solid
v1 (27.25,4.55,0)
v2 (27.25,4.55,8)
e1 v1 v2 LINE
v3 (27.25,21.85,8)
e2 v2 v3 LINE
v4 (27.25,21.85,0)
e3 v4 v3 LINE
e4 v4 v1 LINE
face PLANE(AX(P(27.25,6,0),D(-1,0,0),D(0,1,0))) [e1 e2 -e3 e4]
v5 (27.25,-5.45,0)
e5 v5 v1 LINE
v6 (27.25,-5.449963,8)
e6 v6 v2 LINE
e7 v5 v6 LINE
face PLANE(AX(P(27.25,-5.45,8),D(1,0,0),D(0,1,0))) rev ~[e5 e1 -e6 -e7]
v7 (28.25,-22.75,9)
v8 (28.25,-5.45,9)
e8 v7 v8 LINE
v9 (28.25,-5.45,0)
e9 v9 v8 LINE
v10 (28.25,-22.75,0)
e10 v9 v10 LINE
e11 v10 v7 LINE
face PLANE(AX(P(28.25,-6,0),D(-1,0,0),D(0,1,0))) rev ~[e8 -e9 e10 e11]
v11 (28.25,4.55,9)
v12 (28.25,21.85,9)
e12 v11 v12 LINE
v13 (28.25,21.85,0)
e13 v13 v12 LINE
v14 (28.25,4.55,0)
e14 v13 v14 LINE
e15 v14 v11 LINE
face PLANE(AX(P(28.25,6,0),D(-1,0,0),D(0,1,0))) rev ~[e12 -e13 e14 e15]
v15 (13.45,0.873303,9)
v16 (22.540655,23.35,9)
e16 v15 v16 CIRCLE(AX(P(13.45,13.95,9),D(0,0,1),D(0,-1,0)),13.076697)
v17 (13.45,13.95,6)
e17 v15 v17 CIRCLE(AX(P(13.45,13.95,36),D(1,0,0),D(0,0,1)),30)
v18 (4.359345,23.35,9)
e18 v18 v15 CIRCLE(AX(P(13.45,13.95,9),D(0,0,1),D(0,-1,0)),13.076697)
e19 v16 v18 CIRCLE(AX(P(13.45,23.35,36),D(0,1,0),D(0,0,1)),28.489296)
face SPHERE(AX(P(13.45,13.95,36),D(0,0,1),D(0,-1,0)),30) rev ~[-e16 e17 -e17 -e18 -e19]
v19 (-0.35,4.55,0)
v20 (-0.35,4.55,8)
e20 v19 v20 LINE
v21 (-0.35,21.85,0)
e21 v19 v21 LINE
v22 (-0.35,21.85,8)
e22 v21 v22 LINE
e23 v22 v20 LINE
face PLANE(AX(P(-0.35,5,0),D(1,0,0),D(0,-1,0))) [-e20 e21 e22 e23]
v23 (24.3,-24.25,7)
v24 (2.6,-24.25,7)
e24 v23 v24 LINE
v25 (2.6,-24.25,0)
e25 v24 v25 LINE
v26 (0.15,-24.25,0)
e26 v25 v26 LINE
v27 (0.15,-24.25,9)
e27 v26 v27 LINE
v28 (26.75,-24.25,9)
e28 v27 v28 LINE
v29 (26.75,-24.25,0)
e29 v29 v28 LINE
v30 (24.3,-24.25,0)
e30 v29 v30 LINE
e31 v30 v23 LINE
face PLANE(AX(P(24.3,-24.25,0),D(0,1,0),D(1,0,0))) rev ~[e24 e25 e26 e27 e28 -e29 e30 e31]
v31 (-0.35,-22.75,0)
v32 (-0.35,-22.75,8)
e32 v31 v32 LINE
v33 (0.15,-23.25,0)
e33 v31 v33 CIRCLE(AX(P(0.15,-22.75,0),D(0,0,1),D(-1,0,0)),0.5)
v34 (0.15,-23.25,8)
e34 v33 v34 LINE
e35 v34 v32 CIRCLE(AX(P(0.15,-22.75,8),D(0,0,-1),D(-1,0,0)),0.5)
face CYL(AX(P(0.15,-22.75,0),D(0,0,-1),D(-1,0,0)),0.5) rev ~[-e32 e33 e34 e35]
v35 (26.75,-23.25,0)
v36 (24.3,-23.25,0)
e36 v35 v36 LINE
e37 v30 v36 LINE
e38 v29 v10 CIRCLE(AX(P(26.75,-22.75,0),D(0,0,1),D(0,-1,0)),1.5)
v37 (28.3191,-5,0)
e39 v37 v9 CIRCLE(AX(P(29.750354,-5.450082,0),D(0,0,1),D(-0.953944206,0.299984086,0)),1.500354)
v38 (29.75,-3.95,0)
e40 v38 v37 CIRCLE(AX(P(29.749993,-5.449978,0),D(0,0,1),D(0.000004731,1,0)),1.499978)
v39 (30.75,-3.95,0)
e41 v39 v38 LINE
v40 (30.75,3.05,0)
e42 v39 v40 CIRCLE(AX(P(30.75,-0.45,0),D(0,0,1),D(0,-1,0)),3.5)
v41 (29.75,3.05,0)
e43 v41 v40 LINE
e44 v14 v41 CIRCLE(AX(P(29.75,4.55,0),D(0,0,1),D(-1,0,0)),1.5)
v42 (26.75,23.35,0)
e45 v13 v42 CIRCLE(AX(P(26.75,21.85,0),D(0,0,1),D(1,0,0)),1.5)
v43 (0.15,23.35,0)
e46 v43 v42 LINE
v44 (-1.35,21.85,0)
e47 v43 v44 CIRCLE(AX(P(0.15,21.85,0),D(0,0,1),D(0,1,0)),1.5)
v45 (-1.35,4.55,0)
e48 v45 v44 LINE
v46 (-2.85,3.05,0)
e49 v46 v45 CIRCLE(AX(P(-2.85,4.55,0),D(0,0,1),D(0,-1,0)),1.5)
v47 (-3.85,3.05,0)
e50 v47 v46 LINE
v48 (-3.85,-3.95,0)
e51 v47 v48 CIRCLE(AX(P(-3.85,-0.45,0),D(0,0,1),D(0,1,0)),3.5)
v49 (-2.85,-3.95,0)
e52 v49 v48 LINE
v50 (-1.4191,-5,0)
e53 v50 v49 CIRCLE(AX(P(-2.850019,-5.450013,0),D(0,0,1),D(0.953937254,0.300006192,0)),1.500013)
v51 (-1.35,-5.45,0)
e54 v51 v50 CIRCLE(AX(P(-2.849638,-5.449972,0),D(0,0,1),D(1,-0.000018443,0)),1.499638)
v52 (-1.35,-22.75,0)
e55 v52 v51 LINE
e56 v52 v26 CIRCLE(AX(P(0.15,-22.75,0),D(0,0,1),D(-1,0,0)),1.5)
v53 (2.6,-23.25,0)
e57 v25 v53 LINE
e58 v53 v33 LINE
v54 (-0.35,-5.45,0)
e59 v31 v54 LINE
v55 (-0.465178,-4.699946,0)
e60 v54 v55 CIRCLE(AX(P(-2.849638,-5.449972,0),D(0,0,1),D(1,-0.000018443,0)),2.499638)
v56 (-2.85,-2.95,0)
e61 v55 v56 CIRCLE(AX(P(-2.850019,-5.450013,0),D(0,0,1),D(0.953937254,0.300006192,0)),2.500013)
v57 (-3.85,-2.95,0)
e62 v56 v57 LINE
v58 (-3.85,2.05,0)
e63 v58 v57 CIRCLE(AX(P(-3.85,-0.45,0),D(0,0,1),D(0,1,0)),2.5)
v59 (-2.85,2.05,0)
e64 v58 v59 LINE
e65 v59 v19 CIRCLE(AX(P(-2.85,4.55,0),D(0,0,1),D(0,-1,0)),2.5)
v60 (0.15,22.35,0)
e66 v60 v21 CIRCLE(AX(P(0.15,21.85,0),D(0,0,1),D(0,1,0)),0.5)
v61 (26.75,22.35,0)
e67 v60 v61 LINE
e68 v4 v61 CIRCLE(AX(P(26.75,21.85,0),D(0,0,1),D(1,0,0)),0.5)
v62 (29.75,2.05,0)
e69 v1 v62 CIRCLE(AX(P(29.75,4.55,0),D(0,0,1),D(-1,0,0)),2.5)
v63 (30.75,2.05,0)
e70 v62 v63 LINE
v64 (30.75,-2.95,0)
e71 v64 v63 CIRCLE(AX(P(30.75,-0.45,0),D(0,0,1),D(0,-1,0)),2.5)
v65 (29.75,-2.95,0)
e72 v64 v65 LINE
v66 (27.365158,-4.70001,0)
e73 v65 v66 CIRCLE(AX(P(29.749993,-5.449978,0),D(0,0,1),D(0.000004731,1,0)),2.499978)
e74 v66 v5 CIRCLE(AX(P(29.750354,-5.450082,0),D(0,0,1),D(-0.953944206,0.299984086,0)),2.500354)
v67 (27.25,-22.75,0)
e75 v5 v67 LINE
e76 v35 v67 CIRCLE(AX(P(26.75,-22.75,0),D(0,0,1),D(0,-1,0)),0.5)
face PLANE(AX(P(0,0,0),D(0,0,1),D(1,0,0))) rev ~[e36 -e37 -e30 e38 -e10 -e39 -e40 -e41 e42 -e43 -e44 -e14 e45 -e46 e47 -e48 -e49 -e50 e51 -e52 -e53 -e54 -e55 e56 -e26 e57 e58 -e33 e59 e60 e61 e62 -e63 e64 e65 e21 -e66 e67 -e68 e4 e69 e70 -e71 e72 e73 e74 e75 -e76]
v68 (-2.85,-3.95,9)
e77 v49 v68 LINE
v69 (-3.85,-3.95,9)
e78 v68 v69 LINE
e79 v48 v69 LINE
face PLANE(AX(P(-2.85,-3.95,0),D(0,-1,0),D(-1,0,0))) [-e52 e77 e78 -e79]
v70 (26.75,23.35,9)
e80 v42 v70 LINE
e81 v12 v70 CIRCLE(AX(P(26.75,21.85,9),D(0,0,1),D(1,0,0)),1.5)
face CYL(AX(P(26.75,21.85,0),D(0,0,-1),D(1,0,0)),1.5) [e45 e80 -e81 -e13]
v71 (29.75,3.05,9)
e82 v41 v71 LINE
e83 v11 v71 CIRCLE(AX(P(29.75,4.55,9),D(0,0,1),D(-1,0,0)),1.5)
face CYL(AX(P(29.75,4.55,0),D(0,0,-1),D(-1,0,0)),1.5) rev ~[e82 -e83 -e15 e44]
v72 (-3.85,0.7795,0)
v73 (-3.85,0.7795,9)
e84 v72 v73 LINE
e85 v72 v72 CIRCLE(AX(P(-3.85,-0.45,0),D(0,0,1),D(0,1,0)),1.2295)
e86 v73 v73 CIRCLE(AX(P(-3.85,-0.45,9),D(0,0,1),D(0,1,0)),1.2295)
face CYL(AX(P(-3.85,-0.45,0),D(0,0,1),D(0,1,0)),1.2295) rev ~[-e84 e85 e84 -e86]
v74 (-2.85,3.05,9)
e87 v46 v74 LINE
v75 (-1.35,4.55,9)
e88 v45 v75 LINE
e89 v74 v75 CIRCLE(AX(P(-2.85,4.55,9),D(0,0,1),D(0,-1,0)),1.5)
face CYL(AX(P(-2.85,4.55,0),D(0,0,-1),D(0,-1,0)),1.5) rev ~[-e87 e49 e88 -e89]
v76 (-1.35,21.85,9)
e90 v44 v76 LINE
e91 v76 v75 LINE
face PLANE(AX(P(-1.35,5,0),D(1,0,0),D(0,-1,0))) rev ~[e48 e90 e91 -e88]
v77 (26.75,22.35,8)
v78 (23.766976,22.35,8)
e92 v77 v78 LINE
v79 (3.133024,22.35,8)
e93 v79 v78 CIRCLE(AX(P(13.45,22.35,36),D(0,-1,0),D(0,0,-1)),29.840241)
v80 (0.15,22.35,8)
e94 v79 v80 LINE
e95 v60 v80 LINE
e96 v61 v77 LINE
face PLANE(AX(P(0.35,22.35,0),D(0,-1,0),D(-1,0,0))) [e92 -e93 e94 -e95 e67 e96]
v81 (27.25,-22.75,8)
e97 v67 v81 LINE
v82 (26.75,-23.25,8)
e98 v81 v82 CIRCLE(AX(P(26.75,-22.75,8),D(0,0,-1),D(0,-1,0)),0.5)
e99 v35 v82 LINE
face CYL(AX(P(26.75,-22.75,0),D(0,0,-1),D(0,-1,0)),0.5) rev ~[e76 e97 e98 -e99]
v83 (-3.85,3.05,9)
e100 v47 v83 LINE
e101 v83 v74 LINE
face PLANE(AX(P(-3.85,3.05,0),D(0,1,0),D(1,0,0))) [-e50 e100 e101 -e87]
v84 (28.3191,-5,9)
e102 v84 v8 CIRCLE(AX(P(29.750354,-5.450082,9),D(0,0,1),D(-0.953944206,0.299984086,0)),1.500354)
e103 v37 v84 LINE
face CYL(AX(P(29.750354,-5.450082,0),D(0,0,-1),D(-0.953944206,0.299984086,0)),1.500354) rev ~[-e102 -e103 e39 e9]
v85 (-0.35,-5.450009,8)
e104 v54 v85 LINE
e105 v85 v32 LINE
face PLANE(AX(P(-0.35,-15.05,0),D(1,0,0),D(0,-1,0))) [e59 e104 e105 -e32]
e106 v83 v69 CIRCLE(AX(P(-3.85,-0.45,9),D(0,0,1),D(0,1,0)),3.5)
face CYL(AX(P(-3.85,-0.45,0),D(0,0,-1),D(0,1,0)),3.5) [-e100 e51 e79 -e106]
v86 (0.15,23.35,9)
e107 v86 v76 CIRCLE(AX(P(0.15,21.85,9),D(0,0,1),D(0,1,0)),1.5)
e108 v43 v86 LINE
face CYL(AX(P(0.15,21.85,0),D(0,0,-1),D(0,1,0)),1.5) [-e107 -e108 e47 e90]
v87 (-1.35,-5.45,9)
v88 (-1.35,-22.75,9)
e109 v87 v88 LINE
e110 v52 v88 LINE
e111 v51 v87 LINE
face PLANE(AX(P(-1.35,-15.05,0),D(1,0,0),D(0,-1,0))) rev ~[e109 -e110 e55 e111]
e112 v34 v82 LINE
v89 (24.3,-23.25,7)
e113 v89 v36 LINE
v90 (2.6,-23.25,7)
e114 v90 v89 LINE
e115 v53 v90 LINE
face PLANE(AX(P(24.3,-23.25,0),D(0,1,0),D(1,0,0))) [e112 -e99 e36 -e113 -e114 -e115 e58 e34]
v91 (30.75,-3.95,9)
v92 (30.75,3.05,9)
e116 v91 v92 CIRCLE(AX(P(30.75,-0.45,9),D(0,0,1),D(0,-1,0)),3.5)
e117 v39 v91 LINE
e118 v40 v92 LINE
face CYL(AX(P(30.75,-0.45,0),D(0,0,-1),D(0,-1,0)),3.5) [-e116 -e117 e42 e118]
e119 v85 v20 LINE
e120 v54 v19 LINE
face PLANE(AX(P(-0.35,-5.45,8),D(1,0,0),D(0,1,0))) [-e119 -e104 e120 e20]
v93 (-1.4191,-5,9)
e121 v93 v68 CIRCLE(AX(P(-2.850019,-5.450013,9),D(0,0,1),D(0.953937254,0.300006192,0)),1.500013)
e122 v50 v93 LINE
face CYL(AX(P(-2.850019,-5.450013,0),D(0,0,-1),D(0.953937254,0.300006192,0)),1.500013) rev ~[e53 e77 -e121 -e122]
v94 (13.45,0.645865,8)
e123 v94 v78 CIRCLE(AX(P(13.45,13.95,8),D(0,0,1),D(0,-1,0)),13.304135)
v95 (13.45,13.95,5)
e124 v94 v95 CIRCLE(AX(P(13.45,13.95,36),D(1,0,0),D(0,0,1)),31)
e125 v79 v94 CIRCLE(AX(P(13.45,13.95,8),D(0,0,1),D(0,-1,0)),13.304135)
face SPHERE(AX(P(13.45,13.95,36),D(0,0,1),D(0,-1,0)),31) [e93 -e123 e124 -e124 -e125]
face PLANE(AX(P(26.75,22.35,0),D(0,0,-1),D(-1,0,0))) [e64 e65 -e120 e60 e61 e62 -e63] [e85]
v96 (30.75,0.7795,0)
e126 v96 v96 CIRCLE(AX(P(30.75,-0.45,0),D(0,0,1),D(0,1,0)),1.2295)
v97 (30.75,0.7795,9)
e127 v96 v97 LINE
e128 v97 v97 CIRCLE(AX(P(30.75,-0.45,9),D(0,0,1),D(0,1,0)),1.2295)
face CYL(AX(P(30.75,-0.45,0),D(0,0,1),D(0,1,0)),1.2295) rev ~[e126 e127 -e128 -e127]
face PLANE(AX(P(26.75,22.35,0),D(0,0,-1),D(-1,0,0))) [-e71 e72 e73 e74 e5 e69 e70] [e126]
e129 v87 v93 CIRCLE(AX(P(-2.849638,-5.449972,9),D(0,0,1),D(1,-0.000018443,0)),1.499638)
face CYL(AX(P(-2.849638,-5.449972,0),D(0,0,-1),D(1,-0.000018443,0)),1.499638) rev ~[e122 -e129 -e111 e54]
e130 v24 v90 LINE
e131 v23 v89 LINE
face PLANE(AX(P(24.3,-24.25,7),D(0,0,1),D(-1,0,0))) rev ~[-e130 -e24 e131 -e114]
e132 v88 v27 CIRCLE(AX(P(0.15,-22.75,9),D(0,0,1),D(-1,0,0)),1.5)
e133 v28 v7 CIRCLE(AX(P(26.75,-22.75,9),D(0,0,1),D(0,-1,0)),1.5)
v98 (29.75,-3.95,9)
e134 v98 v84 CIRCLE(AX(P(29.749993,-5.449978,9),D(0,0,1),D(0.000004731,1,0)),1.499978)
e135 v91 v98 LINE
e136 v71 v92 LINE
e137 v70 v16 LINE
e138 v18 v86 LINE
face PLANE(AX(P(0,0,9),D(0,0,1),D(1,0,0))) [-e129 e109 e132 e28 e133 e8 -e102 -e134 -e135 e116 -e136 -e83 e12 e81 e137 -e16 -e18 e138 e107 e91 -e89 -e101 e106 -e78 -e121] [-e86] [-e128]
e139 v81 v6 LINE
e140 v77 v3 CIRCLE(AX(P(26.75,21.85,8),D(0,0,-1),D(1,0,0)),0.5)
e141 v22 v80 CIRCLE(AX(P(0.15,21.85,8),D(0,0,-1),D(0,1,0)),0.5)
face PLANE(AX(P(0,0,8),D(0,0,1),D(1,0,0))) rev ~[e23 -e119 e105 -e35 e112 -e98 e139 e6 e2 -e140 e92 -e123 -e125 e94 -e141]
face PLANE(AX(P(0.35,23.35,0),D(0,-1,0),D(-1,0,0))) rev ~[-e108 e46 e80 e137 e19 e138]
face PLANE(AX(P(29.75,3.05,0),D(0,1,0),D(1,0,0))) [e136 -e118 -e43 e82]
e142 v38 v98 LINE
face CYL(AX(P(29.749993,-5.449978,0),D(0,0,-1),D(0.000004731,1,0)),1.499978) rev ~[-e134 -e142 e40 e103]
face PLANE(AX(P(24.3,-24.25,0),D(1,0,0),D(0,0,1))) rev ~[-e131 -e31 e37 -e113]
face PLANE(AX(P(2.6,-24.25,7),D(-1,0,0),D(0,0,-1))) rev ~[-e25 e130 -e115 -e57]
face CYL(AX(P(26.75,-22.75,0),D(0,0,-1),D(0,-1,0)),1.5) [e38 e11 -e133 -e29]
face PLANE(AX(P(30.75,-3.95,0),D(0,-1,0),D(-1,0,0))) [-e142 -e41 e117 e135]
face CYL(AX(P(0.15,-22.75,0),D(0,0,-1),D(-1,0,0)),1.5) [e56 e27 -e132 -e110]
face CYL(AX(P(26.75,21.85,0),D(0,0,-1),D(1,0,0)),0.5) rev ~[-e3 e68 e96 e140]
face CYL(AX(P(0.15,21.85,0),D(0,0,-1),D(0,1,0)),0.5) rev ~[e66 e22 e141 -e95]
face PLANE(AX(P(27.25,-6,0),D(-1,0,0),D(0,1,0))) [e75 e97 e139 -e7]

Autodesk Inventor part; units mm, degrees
ref_plane "YZ Plane" through (0, 0, 0) normal (1, 0, 0) x (0, 1, 0)
ref_plane "XZ Plane" through (0, 0, 0) normal (0, 1, 0) x (-1, 0, 0)
ref_plane "XY Plane" through (0, 0, 0) normal (0, 0, 1) x (1, 0, 0)
sketch "Sketch1" plane through (0, 0, 0) normal (0, 0, 1) x (1, 0, 0)
  arc A0 (-3.85, 3.05) -> (-3.85, -3.95) centre (-3.85, -0.45) ccw projected
  arc A1 (-1.4191, -5) -> (-2.85, -3.95) centre (-2.85, -5.45) ccw projected
  line L0 (-2.85, -3.95) -> (-3.85, -3.95) projected
  arc A2 (-1.35, -5.45) -> (-1.4191, -5) centre (-2.85, -5.45) ccw projected
  line L1 (-1.35, -5.45) -> (-1.35, -6) projected
  line L2 (-1.35, -6) -> (-1.35, -14.05) projected
  line L3 (-1.35, -14.05) -> (-1.35, -15.05) projected
  line L4 (-1.35, -15.05) -> (-1.35, -22.75) projected
  arc A3 (-1.35, -22.75) -> (0.15, -24.25) centre (0.15, -22.75) ccw projected
  line L5 (0.15, -24.25) -> (2.6, -24.25) projected
  line L6 (24.3, -24.25) -> (2.6, -24.25) projected
  line L7 (24.3, -24.25) -> (26.75, -24.25) projected
  arc A4 (26.75, -24.25) -> (28.25, -22.75) centre (26.75, -22.75) ccw projected
  line L8 (28.25, -22.75) -> (28.25, -15.05) projected
  line L9 (28.25, -15.05) -> (28.25, -14.05) projected
  line L10 (28.25, -14.05) -> (28.25, -6) projected
  line L11 (28.25, -6) -> (28.25, -5.45) projected
  arc A5 (28.3191, -5) -> (28.25, -5.45) centre (29.75, -5.45) ccw projected
  arc A6 (29.75, -3.95) -> (28.3191, -5) centre (29.75, -5.45) ccw projected
  arc A7 (30.75, -3.95) -> (30.75, 3.05) centre (30.75, -0.45) ccw projected
  line L12 (30.75, -3.95) -> (29.75, -3.95) projected
  line L13 (29.75, 3.05) -> (30.75, 3.05) projected
  arc A8 (28.25, 4.55) -> (29.75, 3.05) centre (29.75, 4.55) ccw projected
  line L14 (28.25, 4.55) -> (28.25, 5) projected
  line L15 (28.25, 5) -> (28.25, 6) projected
  line L16 (28.25, 6) -> (28.25, 21.85) projected
  arc A9 (28.25, 21.85) -> (26.75, 23.35) centre (26.75, 21.85) ccw projected
  line L17 (25.45, 23.35) -> (26.55, 23.35) projected
  line L18 (26.75, 23.35) -> (26.55, 23.35) projected
  line L19 (0.35, 23.35) -> (0.15, 23.35) projected
  arc A10 (0.15, 23.35) -> (-1.35, 21.85) centre (0.15, 21.85) ccw projected
  line L20 (0.35, 23.35) -> (1.45, 23.35) projected
  line L21 (-1.35, 5) -> (-1.35, 21.15) projected
  line L22 (-1.35, 21.85) -> (-1.35, 21.15) projected
  line L23 (-1.35, 5) -> (-1.35, 4.55) projected
  arc A11 (-2.85, 3.05) -> (-1.35, 4.55) centre (-2.85, 4.55) ccw projected
  line L24 (-3.85, 3.05) -> (-2.85, 3.05) projected
  line L25 (1.45, 23.35) -> (25.45, 23.35)
  point P0 (0, 0)
extrude "Extrusion1" add sketch "Sketch1" along normal blind 9
ref_plane "Work Plane1" through (13.45, 4.55, 0) normal (-1, 0, 0) x (0, 0, 1)
sketch "Sketch2" plane through (13.45, 4.55, 0) normal (-1, 0, 0) x (0, 0, 1)
  line L0 (9, -8.5) -> (9, -1.5) projected
  circle A0 centre (36, 9.4) radius 30
  line L1 (9, 9.4) -> (36, 9.4)
  line L2 (36, 9.4) -> (66, 9.4)
  line L3 (9, 9.4) -> (6, 9.4)
  line L4 (-3, 9.8) -> (-3, 9) projected
  line L5 (9, -1.5) -> (9, -8.5) projected
  line L6 (9, -8.5) -> (9, -10) projected
  line L7 (9, -10) -> (9, -27.3) projected
  line L8 (9, -27.3) -> (9, -28.8) projected
  line L9 (9, -28.8) -> (9, -27.3) projected
  line L10 (9, -27.3) -> (9, -10) projected
  line L11 (9, -10) -> (9, -8.5) projected
  line L12 (9, -8.5) -> (9, -1.5) projected
  line L13 (9, -1.5) -> (9, 0) projected
  line L14 (9, 0) -> (9, 17.3) projected
  line L15 (9, 17.3) -> (9, 18.8) projected
  line L16 (9, 18.8) -> (9, 17.3) projected
  line L17 (9, 17.3) -> (9, 0) projected
  line L18 (9, 0) -> (9, -1.5) projected
  line L19 (9, 9.4) -> (-3, 9.4)
  point P0 (0, -4.55)
  dimension "d2" = 60
  dimension "d3" = 27
revolve "Revolution1" cut sketch "Sketch2" angle 360 about axis through (13.45, 13.95, 9) along (0, 0, 1) contours A0 L3 L14 L13 L0 | L0 L13 L14 L1 L2 A0
shell "Shell1" thickness 1 removed faces 1 at (9.0167, -11.7167, 0)
sketch "Sketch4" plane through (26.75, 22.35, 8) normal (0, 0, -1) x (-1, 0, 0)
  arc A0 (2.983, 0) -> (23.617, 0) centre (13.3, -8.4) ccw projected
  arc A1 (30.6, -25.3) -> (30.6, -20.3) centre (30.6, -22.8) ccw projected
  line L0 (29.6, -20.3) -> (30.6, -20.3) projected
  arc A2 (27.1, -17.8) -> (29.6, -20.3) centre (29.6, -17.8) ccw projected
  line L1 (27.1, -0.5) -> (27.1, -17.8) projected
  arc A3 (27.1, -0.5) -> (26.6, 0) centre (26.6, -0.5) ccw projected
  line L2 (23.617, 0) -> (26.6, 0) projected
  arc A4 (0, 0) -> (-0.5, -0.5) centre (0, -0.5) ccw projected
  line L3 (-0.5, -17.8) -> (-0.5, -0.5) projected
  arc A5 (-3, -20.3) -> (-0.5, -17.8) centre (-3, -17.8) ccw projected
  line L4 (-4, -20.3) -> (-3, -20.3) projected
  arc A6 (-4, -20.3) -> (-4, -25.3) centre (-4, -22.8) ccw projected
  line L5 (-3, -25.3) -> (-4, -25.3) projected
  arc A7 (-0.5, -27.8) -> (-3, -25.3) centre (-3, -27.8) ccw projected
  line L6 (-0.5, -45.1) -> (-0.5, -27.8) projected
  arc A8 (-0.5, -45.1) -> (0, -45.6) centre (0, -45.1) ccw projected
  line L7 (26.6, -45.6) -> (0, -45.6) projected
  arc A9 (26.6, -45.6) -> (27.1, -45.1) centre (26.6, -45.1) ccw projected
  line L8 (27.1, -27.8) -> (27.1, -45.1) projected
  arc A10 (29.6, -25.3) -> (27.1, -27.8) centre (29.6, -27.8) ccw projected
  line L9 (30.6, -25.3) -> (29.6, -25.3) projected
  line L10 (-0.5, -27.8) -> (-0.5, -17.8)
  line L11 (27.1, -27.8) -> (27.1, -17.8)
  line L12 (0, 0) -> (2.983, 0) projected
  point P0 (26.75, -22.35)
extrude "Extrusion2" add sketch "Sketch4" along normal up to surface (8 mm away) contours L10 A7 L5 A6 L4 A5 | A2 L0 A1 L9 A10 L11
sketch "Sketch5" plane through (0, 0, 0) normal (0, 0, -1) x (-1, 0, 0)
  circle A0 centre (-30.75, -0.45) radius 1.7 projected
  circle A1 centre (3.85, -0.45) radius 1.7 projected
  point P0 (0, 0)
hole "Hole1" at (30.75, -0.45, 0) at (-3.85, -0.45, 0) direction (0, 0, 1) diameter 2.459 end through all thread size "M3x0.5" class "6H" standard "ANSI Metric M Profile"
sketch "Sketch6" plane through (0.15, -24.25, 0) normal (0, -1, 0) x (1, 0, 0)
  line L0 (0, 0) -> (26.6, 0) projected
  line L1 (26.6, 0) -> (26.6, 9) projected
  line L2 (0, 9) -> (26.6, 9) projected
  line L3 (0, 0) -> (0, 9) projected
  line L4 (2.45, -3) -> (2.45, 0) projected
  line L5 (24.15, -3) -> (24.15, 0) projected
  line L6 (2.45, 0) -> (24.15, 0)
  line L7 (24.15, 0) -> (24.15, 7)
  line L8 (24.15, 7) -> (2.45, 7)
  line L9 (2.45, 7) -> (2.45, 0)
  point P0 (-0.15, 0)
  dimension "d15" = 2
extrude "Extrusion3" cut sketch "Sketch6" against normal blind 9 contours L9 L8 L7 L0
properties part number "SphereMount"
